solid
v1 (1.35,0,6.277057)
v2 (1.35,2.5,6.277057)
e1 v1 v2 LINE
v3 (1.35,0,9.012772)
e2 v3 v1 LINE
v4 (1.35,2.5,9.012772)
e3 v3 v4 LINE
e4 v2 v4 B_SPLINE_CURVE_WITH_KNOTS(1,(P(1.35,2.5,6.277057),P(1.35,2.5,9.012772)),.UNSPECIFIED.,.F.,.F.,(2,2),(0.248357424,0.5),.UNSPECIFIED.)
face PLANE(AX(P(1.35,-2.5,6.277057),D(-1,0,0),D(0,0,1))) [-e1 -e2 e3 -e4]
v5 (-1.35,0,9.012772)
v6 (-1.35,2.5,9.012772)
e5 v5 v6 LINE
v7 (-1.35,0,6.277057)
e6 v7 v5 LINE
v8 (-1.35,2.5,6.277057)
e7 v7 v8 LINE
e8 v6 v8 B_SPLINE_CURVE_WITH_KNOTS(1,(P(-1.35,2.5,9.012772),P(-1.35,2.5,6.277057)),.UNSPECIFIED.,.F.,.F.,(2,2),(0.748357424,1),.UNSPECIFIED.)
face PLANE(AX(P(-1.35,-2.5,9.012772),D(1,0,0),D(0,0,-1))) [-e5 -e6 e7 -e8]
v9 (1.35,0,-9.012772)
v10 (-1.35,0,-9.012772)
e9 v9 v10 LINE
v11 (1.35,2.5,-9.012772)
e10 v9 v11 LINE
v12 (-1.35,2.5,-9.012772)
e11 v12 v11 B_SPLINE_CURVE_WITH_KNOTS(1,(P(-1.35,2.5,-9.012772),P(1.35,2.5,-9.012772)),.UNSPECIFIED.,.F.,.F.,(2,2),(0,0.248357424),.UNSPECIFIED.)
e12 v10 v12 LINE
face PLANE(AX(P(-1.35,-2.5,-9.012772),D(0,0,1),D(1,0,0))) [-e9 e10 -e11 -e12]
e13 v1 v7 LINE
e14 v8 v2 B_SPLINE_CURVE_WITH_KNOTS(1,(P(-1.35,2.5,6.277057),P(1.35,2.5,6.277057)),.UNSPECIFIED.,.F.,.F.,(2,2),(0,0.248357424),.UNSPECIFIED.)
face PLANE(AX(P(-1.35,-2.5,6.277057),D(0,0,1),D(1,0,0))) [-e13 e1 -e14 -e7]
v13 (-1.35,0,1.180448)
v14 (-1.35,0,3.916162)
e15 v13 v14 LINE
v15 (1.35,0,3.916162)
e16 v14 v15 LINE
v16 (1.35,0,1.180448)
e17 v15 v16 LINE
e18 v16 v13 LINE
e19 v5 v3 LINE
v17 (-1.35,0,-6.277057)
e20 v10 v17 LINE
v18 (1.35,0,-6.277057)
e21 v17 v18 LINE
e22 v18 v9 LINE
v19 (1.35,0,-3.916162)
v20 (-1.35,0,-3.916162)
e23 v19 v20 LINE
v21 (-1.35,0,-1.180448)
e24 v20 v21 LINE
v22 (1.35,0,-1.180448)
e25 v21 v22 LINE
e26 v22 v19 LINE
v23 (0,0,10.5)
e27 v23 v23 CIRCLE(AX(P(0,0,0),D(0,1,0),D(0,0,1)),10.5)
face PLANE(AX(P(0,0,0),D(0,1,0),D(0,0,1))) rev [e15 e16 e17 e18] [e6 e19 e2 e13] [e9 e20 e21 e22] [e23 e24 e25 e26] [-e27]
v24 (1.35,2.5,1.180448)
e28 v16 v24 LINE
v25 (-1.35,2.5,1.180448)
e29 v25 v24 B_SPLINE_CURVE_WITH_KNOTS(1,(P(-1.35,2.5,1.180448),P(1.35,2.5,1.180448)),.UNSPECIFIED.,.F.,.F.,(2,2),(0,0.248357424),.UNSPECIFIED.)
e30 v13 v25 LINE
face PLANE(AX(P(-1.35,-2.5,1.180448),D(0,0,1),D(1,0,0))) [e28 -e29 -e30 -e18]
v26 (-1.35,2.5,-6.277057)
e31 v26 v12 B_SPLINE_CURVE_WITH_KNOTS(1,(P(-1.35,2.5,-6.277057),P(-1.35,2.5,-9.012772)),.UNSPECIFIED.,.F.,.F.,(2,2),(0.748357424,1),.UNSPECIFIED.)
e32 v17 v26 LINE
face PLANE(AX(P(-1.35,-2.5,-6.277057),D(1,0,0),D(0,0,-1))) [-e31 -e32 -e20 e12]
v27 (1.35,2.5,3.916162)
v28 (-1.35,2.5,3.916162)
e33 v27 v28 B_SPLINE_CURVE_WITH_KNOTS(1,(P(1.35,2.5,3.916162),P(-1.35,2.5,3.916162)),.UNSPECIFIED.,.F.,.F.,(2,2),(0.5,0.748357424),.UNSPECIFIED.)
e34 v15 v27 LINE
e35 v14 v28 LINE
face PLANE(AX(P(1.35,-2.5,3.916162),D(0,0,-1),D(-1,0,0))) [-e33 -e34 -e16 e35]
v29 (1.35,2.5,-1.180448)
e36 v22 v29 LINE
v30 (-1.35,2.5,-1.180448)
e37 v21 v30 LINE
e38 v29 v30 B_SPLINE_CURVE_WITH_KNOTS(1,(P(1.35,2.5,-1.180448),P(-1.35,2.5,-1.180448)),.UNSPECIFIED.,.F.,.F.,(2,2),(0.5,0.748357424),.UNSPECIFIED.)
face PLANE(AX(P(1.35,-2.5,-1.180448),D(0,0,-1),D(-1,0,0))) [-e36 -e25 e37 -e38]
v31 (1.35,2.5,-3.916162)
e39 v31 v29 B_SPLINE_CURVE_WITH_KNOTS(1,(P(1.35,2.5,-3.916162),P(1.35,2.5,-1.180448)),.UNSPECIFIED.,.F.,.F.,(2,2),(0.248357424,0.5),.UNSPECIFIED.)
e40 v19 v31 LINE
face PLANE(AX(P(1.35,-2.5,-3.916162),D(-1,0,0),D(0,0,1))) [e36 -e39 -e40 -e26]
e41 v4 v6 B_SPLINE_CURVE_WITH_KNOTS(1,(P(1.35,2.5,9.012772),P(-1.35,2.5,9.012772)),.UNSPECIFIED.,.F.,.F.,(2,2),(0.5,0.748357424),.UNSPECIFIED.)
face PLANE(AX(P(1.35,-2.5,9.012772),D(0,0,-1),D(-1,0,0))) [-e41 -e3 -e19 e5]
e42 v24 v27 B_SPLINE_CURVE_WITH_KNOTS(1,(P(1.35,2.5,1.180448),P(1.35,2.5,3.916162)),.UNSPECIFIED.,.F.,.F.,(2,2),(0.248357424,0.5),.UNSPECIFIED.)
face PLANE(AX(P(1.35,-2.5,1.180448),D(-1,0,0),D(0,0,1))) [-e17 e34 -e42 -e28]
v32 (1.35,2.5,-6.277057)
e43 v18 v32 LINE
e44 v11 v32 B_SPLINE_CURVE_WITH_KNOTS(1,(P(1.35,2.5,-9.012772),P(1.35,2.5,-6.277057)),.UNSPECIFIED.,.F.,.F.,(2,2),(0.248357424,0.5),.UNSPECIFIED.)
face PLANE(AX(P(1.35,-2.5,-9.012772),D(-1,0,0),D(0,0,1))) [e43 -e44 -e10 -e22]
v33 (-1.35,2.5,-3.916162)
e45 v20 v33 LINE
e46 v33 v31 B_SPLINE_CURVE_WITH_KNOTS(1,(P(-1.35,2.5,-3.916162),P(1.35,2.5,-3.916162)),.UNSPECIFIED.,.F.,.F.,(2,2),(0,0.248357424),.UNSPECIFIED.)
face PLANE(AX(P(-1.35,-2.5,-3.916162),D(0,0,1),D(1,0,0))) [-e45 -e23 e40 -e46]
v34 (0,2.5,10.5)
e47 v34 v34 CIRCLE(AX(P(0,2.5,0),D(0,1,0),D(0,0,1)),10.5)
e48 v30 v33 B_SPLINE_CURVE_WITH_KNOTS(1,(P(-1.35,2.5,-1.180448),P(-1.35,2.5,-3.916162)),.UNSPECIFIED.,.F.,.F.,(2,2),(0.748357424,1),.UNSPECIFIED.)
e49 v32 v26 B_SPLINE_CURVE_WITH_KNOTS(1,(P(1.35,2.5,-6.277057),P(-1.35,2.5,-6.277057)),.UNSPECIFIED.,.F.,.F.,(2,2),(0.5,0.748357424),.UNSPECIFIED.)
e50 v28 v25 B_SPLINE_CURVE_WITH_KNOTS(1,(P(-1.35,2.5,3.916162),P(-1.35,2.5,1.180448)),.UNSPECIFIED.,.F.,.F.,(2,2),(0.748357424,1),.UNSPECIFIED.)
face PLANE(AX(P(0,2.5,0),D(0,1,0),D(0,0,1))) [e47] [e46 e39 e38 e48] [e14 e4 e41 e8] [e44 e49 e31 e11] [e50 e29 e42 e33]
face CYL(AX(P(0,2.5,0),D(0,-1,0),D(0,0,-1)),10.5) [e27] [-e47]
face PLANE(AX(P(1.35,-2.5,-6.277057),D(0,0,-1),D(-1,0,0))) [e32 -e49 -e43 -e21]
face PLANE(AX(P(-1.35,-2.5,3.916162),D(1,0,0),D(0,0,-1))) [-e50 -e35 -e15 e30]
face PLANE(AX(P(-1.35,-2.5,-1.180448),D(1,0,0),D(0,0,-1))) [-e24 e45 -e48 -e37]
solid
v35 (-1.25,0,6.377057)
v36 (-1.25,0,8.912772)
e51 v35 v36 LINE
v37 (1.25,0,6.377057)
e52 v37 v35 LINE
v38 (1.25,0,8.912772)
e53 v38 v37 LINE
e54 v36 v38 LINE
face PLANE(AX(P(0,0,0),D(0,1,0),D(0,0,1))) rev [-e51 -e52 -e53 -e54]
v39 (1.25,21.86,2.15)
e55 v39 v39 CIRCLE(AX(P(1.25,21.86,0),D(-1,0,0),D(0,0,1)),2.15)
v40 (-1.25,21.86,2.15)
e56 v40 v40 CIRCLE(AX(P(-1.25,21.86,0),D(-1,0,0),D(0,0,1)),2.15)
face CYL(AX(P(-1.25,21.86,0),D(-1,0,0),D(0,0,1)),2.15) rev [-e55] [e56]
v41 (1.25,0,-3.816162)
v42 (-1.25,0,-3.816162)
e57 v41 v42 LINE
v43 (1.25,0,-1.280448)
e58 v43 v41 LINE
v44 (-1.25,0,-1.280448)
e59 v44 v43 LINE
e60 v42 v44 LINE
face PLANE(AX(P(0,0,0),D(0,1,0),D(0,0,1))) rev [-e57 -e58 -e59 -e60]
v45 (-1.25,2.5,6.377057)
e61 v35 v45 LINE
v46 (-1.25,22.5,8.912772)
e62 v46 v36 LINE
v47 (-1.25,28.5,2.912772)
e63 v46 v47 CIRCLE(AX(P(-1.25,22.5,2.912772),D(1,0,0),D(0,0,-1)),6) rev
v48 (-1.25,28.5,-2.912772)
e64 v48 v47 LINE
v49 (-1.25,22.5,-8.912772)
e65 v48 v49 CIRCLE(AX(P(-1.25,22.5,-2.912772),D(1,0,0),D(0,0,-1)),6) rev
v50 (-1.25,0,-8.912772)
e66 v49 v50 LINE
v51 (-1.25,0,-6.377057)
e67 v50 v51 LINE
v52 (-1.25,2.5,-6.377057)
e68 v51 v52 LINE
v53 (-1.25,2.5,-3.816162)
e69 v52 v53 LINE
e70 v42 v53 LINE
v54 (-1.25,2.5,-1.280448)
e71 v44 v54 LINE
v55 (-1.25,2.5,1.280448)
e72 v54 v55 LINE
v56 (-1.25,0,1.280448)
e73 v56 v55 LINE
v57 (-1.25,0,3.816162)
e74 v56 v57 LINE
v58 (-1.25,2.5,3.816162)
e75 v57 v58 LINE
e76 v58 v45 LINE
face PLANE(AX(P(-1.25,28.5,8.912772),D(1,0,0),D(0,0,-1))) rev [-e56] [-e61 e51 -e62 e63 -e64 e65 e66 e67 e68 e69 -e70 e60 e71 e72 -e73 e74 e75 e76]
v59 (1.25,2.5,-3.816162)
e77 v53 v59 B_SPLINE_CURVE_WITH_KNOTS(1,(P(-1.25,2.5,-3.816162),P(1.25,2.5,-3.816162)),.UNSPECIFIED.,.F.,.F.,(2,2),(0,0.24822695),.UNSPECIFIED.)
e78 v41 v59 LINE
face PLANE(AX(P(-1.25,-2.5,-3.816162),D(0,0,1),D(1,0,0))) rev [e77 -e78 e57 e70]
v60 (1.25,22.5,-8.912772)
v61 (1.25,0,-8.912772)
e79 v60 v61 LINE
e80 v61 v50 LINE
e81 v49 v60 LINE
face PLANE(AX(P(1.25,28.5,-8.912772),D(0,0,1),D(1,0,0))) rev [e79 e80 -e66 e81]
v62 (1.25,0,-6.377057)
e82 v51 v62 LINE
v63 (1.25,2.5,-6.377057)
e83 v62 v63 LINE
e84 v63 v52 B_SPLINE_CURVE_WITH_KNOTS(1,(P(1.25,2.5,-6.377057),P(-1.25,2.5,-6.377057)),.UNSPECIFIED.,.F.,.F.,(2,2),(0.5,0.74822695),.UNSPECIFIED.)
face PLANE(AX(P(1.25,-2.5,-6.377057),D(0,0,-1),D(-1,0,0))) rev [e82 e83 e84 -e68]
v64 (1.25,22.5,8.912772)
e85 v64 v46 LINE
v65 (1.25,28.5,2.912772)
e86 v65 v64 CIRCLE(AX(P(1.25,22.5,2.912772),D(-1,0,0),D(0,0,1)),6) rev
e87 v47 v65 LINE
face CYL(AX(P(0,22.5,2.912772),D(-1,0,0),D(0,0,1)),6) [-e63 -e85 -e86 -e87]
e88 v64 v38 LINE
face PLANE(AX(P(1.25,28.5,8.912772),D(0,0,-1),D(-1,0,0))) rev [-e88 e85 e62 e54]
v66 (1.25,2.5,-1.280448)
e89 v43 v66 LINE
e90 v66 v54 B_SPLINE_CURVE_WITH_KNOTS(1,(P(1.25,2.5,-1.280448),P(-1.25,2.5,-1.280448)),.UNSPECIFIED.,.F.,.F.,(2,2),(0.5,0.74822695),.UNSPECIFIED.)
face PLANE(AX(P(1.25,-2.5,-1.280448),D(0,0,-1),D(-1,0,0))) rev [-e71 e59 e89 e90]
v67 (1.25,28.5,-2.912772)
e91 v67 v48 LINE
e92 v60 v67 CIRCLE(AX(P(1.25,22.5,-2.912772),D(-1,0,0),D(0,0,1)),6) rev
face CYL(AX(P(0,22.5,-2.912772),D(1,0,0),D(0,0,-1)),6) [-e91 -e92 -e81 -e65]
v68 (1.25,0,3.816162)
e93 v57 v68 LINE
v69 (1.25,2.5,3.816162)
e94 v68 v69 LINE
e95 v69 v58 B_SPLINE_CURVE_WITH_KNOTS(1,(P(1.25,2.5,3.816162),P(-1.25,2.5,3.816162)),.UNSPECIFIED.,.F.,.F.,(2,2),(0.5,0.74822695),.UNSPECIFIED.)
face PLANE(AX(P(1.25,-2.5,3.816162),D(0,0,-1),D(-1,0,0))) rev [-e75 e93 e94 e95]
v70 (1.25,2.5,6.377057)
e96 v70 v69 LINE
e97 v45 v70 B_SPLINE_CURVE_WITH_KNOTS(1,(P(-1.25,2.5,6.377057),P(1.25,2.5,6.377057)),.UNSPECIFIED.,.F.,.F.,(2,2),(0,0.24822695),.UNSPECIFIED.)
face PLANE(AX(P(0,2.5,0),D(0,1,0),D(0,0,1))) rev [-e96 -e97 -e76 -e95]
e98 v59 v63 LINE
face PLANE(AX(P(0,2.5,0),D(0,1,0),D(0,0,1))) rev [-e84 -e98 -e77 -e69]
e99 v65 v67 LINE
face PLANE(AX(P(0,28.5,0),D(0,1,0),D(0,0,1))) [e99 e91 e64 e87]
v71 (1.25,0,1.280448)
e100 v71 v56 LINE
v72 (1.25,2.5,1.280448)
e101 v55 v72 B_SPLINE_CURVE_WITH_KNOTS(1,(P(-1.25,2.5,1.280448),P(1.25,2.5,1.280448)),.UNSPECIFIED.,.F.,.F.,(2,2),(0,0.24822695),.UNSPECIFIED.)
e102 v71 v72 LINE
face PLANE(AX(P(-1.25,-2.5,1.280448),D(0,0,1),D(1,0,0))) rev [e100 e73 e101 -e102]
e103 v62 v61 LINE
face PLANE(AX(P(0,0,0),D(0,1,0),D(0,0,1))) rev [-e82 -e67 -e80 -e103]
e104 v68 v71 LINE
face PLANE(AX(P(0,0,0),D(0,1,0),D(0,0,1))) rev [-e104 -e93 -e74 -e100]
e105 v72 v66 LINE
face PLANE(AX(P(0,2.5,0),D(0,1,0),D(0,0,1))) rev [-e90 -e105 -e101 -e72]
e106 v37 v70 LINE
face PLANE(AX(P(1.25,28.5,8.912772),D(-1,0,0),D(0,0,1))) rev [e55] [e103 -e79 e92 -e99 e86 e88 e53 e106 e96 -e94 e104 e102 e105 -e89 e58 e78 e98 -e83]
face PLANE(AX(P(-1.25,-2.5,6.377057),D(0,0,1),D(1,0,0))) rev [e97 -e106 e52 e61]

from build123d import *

# Parameters (mm, degrees)
SKETCH1_R                     = 10.5
BOSS_EXTRUDE1_DEPTH           = 2.5
SKETCH2_W                     = 2.5
SKETCH2_H                     = 17.82554347
BOSS_EXTRUDE2_DEPTH           = 26
SKETCH5_W                     = 2.15
SKETCH5_H                     = 11.75
FILLET1_R                     = 6
TAB_START                     = -8.912771735
TAB_AND_SLOT_TAB1_OUTLINE_W   = 2.5
TAB_AND_SLOT_TAB1_OUTLINE_H   = 2.5
TAB_AND_SLOT_TAB1_DEPTH       = 2.535714286
TAB_START_2                   = -3.816162007
TAB_AND_SLOT_TAB1_2_OUTLINE_W = 2.5
TAB_AND_SLOT_TAB1_2_OUTLINE_H = 2.5
TAB_AND_SLOT_TAB1_2_DEPTH     = 2.535714286
TAB_START_3                   = 1.280447721
TAB_AND_SLOT_TAB1_3_OUTLINE_W = 2.5
TAB_AND_SLOT_TAB1_3_OUTLINE_H = 2.5
TAB_AND_SLOT_TAB1_3_DEPTH     = 2.535714286
TAB_START_4                   = 6.377057449
TAB_AND_SLOT_TAB1_4_OUTLINE_W = 2.5
TAB_AND_SLOT_TAB1_4_OUTLINE_H = 2.5
TAB_AND_SLOT_TAB1_4_DEPTH     = 2.535714286
TAB_START_5                   = -1.35
TAB_AND_SLOT_SLOT1_OUTLINE_W  = 2.5
TAB_AND_SLOT_SLOT1_OUTLINE_H  = 2.735714286
TAB_AND_SLOT_SLOT1_DEPTH      = 2.7


with BuildPart() as part:
    # Sketch1 → Boss-Extrude1 (new body)
    with BuildSketch(Plane(origin=(0, 0, 0), x_dir=(1, 0, 0), z_dir=(0, 1, 0))):
        with Locations(Location((0, 0, 0), (0, 0, 270))):
            Circle(SKETCH1_R)
    extrude(amount=BOSS_EXTRUDE1_DEPTH)

    # Tab and Slot-Slot1: read off the stored shape, not the designer's step
    # Tab and Slot-Slot1 outline → Tab and Slot-Slot1 (cut)
    with BuildSketch(Plane.YZ.offset(TAB_START_5)):
        with Locations((1.25, -7.644914592)):
            Rectangle(TAB_AND_SLOT_SLOT1_OUTLINE_W, TAB_AND_SLOT_SLOT1_OUTLINE_H)
        with Locations((1.25, -2.548304864)):
            Rectangle(TAB_AND_SLOT_SLOT1_OUTLINE_W, TAB_AND_SLOT_SLOT1_OUTLINE_H)
        with Locations((1.25, 2.548304864)):
            Rectangle(TAB_AND_SLOT_SLOT1_OUTLINE_W, TAB_AND_SLOT_SLOT1_OUTLINE_H)
        with Locations((1.25, 7.644914592)):
            Rectangle(TAB_AND_SLOT_SLOT1_OUTLINE_W, TAB_AND_SLOT_SLOT1_OUTLINE_H)
    extrude(amount=TAB_AND_SLOT_SLOT1_DEPTH, mode=Mode.SUBTRACT)


with BuildPart() as body_2:
    # Sketch2 → Boss-Extrude2 (new body)
    with BuildSketch(Plane(origin=(0, 2.5, 0), x_dir=(1, 0, 0), z_dir=(0, 1, 0))):
        Rectangle(SKETCH2_W, SKETCH2_H)
    extrude(amount=BOSS_EXTRUDE2_DEPTH)

    # Sketch5 → M4 Clearance Hole1 (revolve, cut)
    with BuildSketch(Plane(origin=(-1.25, 21.86, 0), x_dir=(0, 0, 1), z_dir=(0, 1, 0))):
        with Locations((1.075, 5.875)):
            Rectangle(SKETCH5_W, SKETCH5_H)
    revolve(axis=Axis((-7.6, 21.86, 0), (1, 0, 0)), mode=Mode.SUBTRACT)

    # Fillet1
    fillet1_edges = [body_2.edges().sort_by_distance(p)[0] for p in [
        (0, 28.5, -8.912771735),
        (0, 28.5, 8.912771735),
    ]]
    fillet(fillet1_edges, radius=FILLET1_R)

    # Tab and Slot-Tab1: read off the stored shape, not the designer's step
    # Tab and Slot-Tab1 outline → Tab and Slot-Tab1 (add)
    with BuildSketch(Plane.XY.offset(TAB_START)):
        with Locations((0, 1.25)):
            Rectangle(TAB_AND_SLOT_TAB1_OUTLINE_W, TAB_AND_SLOT_TAB1_OUTLINE_H)
    extrude(amount=TAB_AND_SLOT_TAB1_DEPTH)

    # Tab and Slot-Tab1 2 outline → Tab and Slot-Tab1 2 (add)
    with BuildSketch(Plane.XY.offset(TAB_START_2)):
        with Locations((0, 1.25)):
            Rectangle(TAB_AND_SLOT_TAB1_2_OUTLINE_W, TAB_AND_SLOT_TAB1_2_OUTLINE_H)
    extrude(amount=TAB_AND_SLOT_TAB1_2_DEPTH)

    # Tab and Slot-Tab1 3 outline → Tab and Slot-Tab1 3 (add)
    with BuildSketch(Plane.XY.offset(TAB_START_3)):
        with Locations((0, 1.25)):
            Rectangle(TAB_AND_SLOT_TAB1_3_OUTLINE_W, TAB_AND_SLOT_TAB1_3_OUTLINE_H)
    extrude(amount=TAB_AND_SLOT_TAB1_3_DEPTH)

    # Tab and Slot-Tab1 4 outline → Tab and Slot-Tab1 4 (add)
    with BuildSketch(Plane.XY.offset(TAB_START_4)):
        with Locations((0, 1.25)):
            Rectangle(TAB_AND_SLOT_TAB1_4_OUTLINE_W, TAB_AND_SLOT_TAB1_4_OUTLINE_H)
    extrude(amount=TAB_AND_SLOT_TAB1_4_DEPTH)


solid = Compound([part.part, body_2.part])
